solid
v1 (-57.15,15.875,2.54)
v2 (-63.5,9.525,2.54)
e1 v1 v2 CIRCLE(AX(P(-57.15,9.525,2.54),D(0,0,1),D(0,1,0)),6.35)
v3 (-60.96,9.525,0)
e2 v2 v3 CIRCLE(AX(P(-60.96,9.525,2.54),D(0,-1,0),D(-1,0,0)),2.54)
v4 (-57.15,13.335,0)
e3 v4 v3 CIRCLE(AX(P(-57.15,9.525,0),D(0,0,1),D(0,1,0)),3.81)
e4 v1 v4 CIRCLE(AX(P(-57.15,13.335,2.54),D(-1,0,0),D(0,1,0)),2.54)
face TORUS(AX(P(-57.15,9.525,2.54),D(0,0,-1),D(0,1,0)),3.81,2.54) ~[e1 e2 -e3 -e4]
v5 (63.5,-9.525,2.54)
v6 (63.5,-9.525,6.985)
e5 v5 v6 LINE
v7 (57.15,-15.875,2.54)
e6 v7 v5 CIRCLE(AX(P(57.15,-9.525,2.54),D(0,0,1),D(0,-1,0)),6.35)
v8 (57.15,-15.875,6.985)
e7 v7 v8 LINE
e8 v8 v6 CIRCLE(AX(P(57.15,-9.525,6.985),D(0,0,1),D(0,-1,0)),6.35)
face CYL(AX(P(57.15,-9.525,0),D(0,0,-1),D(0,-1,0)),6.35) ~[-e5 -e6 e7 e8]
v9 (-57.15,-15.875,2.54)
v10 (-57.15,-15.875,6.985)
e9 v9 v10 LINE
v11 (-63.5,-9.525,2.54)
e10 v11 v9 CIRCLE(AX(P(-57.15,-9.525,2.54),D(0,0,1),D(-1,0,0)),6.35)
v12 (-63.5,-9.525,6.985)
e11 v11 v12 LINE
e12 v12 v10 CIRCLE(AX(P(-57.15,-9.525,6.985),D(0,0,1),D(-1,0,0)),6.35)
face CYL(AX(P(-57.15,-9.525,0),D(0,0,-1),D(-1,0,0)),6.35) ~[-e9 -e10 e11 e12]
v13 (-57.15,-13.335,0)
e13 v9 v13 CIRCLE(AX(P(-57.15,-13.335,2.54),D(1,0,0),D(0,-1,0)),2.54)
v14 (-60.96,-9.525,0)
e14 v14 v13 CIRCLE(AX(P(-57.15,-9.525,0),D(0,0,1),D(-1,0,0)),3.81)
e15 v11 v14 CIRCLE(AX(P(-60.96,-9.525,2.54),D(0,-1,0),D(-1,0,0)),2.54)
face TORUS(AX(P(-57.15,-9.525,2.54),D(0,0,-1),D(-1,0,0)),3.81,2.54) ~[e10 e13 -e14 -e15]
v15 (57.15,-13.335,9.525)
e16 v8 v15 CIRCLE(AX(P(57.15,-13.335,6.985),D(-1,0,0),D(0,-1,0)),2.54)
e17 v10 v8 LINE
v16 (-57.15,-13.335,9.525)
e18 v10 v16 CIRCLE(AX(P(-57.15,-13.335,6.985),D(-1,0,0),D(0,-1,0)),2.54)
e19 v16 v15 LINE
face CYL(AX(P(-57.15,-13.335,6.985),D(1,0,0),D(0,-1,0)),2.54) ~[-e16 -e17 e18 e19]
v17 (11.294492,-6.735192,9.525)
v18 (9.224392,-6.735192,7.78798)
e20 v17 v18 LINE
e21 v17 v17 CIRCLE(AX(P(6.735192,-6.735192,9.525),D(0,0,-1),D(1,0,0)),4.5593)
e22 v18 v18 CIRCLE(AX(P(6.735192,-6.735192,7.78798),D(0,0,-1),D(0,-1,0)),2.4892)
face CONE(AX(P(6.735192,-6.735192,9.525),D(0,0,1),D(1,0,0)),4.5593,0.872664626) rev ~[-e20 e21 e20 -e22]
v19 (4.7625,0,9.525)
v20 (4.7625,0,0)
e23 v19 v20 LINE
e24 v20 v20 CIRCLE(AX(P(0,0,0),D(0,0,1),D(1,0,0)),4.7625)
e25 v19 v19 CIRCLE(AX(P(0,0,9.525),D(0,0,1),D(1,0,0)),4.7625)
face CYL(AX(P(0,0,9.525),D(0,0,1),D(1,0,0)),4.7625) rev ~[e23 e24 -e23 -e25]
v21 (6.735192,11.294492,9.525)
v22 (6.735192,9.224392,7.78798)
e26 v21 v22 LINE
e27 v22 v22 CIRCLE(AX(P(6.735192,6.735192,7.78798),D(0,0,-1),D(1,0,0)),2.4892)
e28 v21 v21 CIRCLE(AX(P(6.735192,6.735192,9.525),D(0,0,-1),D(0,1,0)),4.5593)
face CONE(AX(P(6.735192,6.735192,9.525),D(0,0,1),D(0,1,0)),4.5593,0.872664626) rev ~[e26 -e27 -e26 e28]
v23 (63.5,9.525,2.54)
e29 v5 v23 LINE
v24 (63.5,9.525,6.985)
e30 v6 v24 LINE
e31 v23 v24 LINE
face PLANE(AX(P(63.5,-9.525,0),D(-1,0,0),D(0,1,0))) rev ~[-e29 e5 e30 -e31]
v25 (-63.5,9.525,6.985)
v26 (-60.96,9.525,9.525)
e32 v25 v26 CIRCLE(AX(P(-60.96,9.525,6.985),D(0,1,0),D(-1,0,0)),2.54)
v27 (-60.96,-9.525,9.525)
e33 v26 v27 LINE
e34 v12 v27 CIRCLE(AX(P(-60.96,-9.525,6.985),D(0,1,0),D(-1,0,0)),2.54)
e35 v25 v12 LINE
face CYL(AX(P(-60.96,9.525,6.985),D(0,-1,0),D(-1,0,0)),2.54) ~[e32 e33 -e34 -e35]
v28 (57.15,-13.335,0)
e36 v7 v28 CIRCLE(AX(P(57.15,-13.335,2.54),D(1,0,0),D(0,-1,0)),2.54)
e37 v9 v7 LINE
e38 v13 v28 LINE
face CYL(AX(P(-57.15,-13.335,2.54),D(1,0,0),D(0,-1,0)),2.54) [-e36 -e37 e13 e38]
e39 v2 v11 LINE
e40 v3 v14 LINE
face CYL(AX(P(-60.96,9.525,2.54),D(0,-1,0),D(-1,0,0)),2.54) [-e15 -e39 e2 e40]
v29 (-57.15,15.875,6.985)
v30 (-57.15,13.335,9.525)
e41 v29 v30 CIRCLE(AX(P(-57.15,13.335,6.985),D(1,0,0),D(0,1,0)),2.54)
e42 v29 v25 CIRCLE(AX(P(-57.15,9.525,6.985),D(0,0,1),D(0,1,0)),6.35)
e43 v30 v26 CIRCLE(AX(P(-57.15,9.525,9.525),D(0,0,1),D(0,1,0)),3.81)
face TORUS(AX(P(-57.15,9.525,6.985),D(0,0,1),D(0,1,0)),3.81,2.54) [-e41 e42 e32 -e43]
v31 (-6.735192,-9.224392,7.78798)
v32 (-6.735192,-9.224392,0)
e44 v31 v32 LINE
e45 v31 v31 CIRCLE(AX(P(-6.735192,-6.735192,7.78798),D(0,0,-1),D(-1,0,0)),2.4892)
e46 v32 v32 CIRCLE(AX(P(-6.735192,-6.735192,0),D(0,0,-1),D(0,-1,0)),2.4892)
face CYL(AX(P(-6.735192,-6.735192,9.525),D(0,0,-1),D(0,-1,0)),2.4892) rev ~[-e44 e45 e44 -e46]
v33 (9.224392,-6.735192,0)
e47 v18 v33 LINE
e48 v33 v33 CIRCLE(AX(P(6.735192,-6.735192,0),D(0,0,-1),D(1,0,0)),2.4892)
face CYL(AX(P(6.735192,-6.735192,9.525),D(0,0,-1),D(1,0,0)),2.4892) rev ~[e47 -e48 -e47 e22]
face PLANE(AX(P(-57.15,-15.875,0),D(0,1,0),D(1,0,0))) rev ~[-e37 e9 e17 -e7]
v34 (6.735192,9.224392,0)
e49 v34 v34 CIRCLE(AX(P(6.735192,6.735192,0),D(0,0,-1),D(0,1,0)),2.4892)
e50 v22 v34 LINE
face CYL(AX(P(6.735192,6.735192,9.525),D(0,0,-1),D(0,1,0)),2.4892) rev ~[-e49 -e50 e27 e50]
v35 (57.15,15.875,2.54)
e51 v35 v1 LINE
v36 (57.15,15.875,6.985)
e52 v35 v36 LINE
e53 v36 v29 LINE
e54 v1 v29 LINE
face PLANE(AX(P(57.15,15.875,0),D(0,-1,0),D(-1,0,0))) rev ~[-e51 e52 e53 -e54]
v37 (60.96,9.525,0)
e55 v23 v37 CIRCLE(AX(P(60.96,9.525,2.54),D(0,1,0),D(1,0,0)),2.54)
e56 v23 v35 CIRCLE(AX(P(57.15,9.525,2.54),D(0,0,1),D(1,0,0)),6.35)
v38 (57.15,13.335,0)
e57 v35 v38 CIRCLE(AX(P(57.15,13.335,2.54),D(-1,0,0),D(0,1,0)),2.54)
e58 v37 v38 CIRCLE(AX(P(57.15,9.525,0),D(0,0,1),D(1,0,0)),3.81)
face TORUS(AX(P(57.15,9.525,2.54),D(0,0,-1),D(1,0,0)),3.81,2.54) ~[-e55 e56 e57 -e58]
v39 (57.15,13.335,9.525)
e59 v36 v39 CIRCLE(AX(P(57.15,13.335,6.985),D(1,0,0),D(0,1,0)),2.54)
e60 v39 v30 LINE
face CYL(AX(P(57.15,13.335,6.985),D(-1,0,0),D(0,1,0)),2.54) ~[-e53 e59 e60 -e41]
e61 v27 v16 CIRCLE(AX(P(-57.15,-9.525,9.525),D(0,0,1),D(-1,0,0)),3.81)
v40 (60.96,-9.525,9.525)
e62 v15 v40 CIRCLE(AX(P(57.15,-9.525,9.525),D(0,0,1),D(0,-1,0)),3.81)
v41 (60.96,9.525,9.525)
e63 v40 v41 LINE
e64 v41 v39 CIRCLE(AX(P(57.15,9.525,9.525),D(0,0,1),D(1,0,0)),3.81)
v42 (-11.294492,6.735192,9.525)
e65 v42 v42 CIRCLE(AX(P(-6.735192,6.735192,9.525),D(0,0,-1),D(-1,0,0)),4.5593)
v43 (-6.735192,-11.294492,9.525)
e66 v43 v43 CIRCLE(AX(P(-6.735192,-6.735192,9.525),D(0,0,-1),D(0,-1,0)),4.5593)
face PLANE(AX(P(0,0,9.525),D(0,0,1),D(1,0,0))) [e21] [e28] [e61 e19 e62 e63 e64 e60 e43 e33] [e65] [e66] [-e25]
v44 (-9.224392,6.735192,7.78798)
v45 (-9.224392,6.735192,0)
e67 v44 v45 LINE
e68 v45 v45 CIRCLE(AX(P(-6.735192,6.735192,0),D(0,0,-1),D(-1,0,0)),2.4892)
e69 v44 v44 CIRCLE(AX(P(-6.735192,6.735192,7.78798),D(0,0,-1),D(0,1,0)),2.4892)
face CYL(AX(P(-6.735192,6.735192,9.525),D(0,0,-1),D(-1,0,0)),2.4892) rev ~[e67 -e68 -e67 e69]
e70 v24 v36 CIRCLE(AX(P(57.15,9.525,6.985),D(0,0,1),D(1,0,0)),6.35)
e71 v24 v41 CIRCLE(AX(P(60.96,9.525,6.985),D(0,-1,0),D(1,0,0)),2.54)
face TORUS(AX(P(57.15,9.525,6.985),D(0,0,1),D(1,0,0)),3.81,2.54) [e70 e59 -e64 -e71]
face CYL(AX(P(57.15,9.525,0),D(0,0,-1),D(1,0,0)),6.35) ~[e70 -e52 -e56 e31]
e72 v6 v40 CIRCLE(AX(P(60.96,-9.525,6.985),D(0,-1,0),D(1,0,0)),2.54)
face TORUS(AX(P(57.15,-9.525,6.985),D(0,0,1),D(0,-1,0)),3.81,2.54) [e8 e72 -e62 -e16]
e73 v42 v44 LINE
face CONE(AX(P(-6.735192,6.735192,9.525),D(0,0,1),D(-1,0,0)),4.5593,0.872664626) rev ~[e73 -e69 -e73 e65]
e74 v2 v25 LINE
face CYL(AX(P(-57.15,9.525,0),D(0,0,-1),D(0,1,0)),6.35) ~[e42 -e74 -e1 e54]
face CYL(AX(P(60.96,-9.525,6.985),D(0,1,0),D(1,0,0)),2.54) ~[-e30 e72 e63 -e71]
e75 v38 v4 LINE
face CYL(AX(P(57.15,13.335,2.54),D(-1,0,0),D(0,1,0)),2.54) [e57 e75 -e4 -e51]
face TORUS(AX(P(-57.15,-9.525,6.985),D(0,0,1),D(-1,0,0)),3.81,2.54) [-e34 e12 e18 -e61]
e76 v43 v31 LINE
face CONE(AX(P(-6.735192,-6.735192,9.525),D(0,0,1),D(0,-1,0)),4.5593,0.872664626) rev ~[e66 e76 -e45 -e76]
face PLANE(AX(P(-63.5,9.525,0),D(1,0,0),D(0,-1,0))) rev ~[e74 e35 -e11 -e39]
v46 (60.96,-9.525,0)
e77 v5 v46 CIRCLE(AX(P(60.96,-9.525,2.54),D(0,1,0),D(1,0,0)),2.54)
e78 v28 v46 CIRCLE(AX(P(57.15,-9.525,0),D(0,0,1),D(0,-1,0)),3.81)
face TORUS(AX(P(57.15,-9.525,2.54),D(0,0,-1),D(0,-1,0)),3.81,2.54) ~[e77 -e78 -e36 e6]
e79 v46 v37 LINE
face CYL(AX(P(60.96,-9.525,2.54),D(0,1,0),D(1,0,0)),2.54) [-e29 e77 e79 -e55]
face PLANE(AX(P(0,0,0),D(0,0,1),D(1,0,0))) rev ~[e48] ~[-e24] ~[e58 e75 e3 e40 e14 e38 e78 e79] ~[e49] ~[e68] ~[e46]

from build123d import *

# Parameters (mm, degrees)
F1_DEPTH        = 9.525
F2_R            = 2.54
F3_R            = 4.7625
F4_DEPTH        = 25.4
F6_D            = 4.9784
F6_CSINK_D      = 9.1186
F6_CSINK_ANGLE  = 100
F6_COPIES_COUNT = 4


# Not quite as in the source:
# - a pattern or mirror of a feature is missing from the dataset's text; its kind, count and spacing are read off the source's solid


with BuildPart() as f1:
    # F0 (on Top) → F1 (new body)
    with BuildSketch(Plane.XY):
        with BuildLine():
            Line((-57.15, -15.875), (57.15, -15.875))
            ThreePointArc((57.15, -15.875), (61.6401280605, -14.0151280605), (63.5, -9.525))
            Line((63.5, -9.525), (63.5, 9.525))
            ThreePointArc((63.5, 9.525), (61.6401280605, 14.0151280605), (57.15, 15.875))
            Line((57.15, 15.875), (-57.15, 15.875))
            ThreePointArc((-57.15, 15.875), (-61.6401280605, 14.0151280605), (-63.5, 9.525))
            Line((-63.5, 9.525), (-63.5, -9.525))
            ThreePointArc((-63.5, -9.525), (-61.6401280605, -14.0151280605), (-57.15, -15.875))
        make_face()
    extrude(amount=F1_DEPTH)

    # F2
    f2_edges = [f1.edges().sort_by_distance(p)[0] for p in [
        (0, -15.875, 9.525),
        (61.640128, -14.015128, 9.525),
        (63.5, 0, 9.525),
        (61.640128, 14.015128, 9.525),
        (0, 15.875, 9.525),
        (-61.640128, 14.015128, 9.525),
        (-63.5, 0, 9.525),
        (-61.640128, -14.015128, 9.525),
        (0, -15.875, 0),
        (61.640128, -14.015128, 0),
        (63.5, 0, 0),
        (61.640128, 14.015128, 0),
        (0, 15.875, 0),
        (-61.640128, 14.015128, 0),
        (-63.5, 0, 0),
        (-61.640128, -14.015128, 0),
    ]]
    fillet(f2_edges, radius=F2_R)

    # F3 (on face) → F4 (cut)
    with BuildSketch(Plane.XY.offset(9.525)):
        Circle(F3_R)
    extrude(amount=-F4_DEPTH, mode=Mode.SUBTRACT)

    # F6 (through all)
    with Locations(Plane.XY.offset(9.525)):
        with Locations((-6.7351920908, 6.7351920908)):
            f6 = CounterSinkHole(F6_D / 2, F6_CSINK_D / 2, counter_sink_angle=F6_CSINK_ANGLE)

    # F6_copies: F6 ×4 about axis
    f6_copies_axis = Axis((0, 0, 0), (0, 0, 1))
    for i in range(1, F6_COPIES_COUNT):
        add(f6.rotate(f6_copies_axis, i * 360 / F6_COPIES_COUNT), mode=Mode.SUBTRACT)


solid = f1.part
